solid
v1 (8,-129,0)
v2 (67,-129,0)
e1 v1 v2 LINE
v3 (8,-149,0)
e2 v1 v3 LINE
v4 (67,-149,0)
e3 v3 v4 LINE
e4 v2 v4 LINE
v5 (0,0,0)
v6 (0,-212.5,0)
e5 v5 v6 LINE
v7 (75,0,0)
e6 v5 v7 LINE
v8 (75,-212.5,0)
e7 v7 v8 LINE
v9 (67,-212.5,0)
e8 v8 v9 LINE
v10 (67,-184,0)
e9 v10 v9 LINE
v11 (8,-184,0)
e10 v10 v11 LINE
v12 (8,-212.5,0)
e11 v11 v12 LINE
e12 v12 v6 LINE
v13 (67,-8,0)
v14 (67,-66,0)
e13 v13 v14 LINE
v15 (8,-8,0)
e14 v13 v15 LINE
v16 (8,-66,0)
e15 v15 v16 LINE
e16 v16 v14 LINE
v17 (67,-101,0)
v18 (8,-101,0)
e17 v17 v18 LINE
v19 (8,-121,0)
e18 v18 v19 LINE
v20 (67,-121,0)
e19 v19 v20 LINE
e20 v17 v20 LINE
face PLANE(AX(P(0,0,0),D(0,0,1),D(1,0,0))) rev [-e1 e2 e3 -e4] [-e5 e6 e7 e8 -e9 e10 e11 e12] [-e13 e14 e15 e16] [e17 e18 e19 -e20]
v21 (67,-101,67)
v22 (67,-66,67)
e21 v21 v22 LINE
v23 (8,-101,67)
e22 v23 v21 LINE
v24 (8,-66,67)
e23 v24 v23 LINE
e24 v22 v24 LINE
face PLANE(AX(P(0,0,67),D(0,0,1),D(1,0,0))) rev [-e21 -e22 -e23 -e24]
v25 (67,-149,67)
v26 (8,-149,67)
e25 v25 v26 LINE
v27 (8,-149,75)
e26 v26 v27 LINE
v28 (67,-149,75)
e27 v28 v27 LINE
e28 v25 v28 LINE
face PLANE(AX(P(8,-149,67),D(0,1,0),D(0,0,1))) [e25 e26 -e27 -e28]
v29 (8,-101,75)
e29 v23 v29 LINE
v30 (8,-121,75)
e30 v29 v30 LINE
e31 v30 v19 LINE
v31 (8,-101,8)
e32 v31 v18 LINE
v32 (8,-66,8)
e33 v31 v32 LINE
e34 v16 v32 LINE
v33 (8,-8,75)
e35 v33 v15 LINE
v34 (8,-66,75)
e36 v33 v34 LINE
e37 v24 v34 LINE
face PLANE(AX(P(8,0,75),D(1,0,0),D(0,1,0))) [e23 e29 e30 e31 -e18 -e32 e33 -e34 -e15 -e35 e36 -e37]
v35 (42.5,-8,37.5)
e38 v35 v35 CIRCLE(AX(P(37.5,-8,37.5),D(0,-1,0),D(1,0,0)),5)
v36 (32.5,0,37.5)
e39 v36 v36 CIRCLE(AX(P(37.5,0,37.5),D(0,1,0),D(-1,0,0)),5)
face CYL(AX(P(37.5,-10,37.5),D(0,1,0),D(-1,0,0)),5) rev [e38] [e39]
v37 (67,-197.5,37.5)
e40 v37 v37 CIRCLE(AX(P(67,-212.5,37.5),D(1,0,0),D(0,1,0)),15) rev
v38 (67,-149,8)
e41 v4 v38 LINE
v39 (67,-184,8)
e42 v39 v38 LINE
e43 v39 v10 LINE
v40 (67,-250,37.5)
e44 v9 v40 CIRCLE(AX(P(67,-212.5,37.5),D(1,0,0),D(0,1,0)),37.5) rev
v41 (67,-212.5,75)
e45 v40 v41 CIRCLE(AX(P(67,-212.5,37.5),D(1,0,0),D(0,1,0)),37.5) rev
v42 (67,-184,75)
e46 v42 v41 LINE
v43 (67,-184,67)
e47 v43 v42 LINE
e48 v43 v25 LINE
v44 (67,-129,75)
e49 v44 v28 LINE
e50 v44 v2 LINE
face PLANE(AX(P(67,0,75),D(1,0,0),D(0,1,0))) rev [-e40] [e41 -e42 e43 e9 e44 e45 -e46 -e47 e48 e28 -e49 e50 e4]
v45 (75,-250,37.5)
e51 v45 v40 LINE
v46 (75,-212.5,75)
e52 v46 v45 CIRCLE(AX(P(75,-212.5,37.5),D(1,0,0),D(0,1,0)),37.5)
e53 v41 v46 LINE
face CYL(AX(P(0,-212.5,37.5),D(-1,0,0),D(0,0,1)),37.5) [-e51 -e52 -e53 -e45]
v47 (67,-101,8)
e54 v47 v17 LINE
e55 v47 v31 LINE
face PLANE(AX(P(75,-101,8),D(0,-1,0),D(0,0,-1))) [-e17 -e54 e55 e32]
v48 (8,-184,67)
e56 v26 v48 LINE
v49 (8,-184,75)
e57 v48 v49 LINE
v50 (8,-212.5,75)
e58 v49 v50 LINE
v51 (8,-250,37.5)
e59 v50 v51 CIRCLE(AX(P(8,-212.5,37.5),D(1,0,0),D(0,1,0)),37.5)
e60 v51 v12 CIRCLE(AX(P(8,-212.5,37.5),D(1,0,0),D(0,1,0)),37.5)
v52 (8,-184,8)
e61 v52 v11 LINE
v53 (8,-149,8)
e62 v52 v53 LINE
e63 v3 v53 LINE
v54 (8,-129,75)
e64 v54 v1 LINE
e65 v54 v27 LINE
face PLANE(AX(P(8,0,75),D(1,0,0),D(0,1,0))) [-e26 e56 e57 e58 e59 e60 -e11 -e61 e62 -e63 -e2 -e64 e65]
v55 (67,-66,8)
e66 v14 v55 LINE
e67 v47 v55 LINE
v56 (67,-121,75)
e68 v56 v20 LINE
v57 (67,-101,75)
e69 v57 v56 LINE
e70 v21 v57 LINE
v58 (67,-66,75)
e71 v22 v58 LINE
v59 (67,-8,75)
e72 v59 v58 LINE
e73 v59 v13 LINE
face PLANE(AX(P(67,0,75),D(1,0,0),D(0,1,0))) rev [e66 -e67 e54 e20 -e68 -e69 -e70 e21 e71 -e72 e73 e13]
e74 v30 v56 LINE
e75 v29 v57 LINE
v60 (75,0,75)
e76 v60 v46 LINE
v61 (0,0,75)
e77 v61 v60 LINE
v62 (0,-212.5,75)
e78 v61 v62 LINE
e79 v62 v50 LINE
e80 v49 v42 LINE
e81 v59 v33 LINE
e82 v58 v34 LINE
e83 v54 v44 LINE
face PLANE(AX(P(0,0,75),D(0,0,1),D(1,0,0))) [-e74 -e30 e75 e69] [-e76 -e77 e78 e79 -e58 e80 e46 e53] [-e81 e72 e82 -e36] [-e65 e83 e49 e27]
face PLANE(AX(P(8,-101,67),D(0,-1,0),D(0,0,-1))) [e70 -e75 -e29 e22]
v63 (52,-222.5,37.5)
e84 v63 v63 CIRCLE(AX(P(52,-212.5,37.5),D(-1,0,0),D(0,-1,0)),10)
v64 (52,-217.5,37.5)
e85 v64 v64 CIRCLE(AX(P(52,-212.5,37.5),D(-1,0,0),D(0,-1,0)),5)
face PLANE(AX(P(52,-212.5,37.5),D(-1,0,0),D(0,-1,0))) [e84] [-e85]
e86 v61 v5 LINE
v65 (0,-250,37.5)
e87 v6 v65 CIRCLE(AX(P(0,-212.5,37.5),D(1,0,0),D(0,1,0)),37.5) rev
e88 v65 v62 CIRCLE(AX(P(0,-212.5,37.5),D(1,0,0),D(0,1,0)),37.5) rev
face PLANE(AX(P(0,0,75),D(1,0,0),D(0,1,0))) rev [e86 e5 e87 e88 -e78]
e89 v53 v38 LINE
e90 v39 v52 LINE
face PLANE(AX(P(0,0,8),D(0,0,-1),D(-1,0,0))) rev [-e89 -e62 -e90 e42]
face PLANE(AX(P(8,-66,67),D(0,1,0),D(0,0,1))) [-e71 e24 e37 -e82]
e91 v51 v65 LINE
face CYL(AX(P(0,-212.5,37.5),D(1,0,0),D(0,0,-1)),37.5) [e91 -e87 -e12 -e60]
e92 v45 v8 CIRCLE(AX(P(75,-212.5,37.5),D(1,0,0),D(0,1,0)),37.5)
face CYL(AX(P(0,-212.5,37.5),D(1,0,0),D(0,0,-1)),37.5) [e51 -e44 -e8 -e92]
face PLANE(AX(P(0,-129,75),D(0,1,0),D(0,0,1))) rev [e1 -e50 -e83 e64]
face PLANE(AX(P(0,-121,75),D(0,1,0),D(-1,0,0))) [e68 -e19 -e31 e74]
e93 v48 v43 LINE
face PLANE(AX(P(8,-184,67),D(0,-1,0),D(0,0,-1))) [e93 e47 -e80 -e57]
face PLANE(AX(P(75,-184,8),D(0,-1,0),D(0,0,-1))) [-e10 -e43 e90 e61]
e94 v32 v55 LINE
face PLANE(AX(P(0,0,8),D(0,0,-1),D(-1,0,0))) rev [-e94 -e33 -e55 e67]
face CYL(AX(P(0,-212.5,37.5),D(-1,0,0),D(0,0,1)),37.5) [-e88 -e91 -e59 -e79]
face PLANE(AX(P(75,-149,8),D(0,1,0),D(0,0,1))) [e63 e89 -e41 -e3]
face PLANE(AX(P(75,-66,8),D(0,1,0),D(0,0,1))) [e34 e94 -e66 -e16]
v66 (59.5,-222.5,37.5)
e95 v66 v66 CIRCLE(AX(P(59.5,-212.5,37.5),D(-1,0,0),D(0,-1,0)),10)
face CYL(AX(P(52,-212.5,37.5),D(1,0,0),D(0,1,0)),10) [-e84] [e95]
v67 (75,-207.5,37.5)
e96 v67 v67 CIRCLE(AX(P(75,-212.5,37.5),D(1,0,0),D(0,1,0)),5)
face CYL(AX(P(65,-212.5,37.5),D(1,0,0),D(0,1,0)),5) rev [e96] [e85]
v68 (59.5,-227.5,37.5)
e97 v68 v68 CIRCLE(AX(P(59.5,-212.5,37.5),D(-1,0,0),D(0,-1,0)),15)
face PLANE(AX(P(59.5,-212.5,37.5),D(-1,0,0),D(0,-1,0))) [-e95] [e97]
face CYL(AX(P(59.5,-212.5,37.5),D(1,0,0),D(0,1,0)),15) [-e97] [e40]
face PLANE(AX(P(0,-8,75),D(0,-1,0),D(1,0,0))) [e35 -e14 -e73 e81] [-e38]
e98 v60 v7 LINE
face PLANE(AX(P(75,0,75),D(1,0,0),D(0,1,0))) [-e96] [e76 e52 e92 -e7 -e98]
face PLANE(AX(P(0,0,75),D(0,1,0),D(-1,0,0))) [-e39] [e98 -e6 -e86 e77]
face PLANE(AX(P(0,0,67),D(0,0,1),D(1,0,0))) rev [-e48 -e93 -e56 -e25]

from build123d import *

# Parameters (mm, degrees)
SKETCH1_W           = 59
SKETCH1_H           = 8
BOSS_EXTRUDE2_DEPTH = 75
FILLET1_R           = 37.5
SKETCH2_R           = 5
CUT_EXTRUDE1_DEPTH  = 10
SKETCH3_R           = 15
SKETCH3_R_2         = 5
BOSS_EXTRUDE3_DEPTH = 7.5
SKETCH4_R           = 10
SKETCH4_R_2         = 5
BOSS_EXTRUDE4_DEPTH = 7.5
SKETCH5_R           = 5
CUT_EXTRUDE2_DEPTH  = 10
SKETCH6_W           = 75
SKETCH6_H           = 35
BOSS_EXTRUDE5_DEPTH = 8
SKETCH7_W           = 59
SKETCH7_H           = 35
BOSS_EXTRUDE6_DEPTH = 8


with BuildPart() as part:
    # Sketch1 → Boss-Extrude2 (new body)
    with BuildSketch(Plane.XY):
        Polygon((8, -8), (8, -250), (0, -250), (0, 0), (75, 0), (75, -250), (67, -250), (67, -8), align=None)
        with Locations((37.5, -125)):
            Rectangle(SKETCH1_W, SKETCH1_H)
    extrude(amount=BOSS_EXTRUDE2_DEPTH)

    # Fillet1
    fillet1_edges = [part.edges().sort_by_distance(p)[0] for p in [
        (4, -250, 0),
        (71, -250, 0),
        (71, -250, 75),
        (4, -250, 75),
    ]]
    fillet(fillet1_edges, radius=FILLET1_R - 0.0001)  # a hair under: the kernel refuses the full size

    # Sketch2 → Cut-Extrude1 (cut)
    with BuildSketch(Plane(origin=(75, 0, 0), x_dir=(0, 0, -1), z_dir=(1, 0, 0))):
        with Locations(Location((-37.5, -212.5, 0), (0, 0, 90))):
            Circle(SKETCH2_R)
    extrude(amount=-CUT_EXTRUDE1_DEPTH, mode=Mode.SUBTRACT)

    # Sketch3 → Boss-Extrude3 (add)
    with BuildSketch(Plane.ZY.offset(-67)):
        with Locations(Location((37.5, -212.5, 0), (0, 0, 90))):
            Circle(SKETCH3_R)
        with Locations(Location((37.5, -212.5, 0), (0, 0, 90))):
            Circle(SKETCH3_R_2, mode=Mode.SUBTRACT)
    extrude(amount=BOSS_EXTRUDE3_DEPTH)

    # Sketch4 → Boss-Extrude4 (add)
    with BuildSketch(Plane.ZY.offset(-59.5)):
        with Locations(Location((37.5, -212.5, 0), (0, 0, 270))):
            Circle(SKETCH4_R)
        with Locations(Location((37.5, -212.5, 0), (0, 0, 90))):
            Circle(SKETCH4_R_2, mode=Mode.SUBTRACT)
    extrude(amount=BOSS_EXTRUDE4_DEPTH)

    # Sketch5 → Cut-Extrude2 (cut)
    with BuildSketch(Plane(origin=(0, 0, 0), x_dir=(1, 0, 0), z_dir=(0, 1, 0))):
        with Locations(Location((37.5, -37.5, 0), (0, 0, 180))):
            Circle(SKETCH5_R)
    extrude(amount=-CUT_EXTRUDE2_DEPTH, mode=Mode.SUBTRACT)

    # Sketch6 → Boss-Extrude5 (add)
    with BuildSketch(Plane(origin=(0, 0, 0), x_dir=(-1, 0, 0), z_dir=(0, 0, -1))):
        with Locations((-37.5, -83.5)):
            Rectangle(SKETCH6_W, SKETCH6_H)
        with Locations((-37.5, -166.5)):
            Rectangle(SKETCH6_W, SKETCH6_H)
    extrude(amount=-BOSS_EXTRUDE5_DEPTH)

    # Sketch7 → Boss-Extrude6 (add)
    with BuildSketch(Plane.XY.offset(75)):
        with Locations((37.5, -83.5)):
            Rectangle(SKETCH7_W, SKETCH7_H)
        with Locations((37.5, -166.5)):
            Rectangle(SKETCH7_W, SKETCH7_H)
    extrude(amount=-BOSS_EXTRUDE6_DEPTH)


solid = part.part
